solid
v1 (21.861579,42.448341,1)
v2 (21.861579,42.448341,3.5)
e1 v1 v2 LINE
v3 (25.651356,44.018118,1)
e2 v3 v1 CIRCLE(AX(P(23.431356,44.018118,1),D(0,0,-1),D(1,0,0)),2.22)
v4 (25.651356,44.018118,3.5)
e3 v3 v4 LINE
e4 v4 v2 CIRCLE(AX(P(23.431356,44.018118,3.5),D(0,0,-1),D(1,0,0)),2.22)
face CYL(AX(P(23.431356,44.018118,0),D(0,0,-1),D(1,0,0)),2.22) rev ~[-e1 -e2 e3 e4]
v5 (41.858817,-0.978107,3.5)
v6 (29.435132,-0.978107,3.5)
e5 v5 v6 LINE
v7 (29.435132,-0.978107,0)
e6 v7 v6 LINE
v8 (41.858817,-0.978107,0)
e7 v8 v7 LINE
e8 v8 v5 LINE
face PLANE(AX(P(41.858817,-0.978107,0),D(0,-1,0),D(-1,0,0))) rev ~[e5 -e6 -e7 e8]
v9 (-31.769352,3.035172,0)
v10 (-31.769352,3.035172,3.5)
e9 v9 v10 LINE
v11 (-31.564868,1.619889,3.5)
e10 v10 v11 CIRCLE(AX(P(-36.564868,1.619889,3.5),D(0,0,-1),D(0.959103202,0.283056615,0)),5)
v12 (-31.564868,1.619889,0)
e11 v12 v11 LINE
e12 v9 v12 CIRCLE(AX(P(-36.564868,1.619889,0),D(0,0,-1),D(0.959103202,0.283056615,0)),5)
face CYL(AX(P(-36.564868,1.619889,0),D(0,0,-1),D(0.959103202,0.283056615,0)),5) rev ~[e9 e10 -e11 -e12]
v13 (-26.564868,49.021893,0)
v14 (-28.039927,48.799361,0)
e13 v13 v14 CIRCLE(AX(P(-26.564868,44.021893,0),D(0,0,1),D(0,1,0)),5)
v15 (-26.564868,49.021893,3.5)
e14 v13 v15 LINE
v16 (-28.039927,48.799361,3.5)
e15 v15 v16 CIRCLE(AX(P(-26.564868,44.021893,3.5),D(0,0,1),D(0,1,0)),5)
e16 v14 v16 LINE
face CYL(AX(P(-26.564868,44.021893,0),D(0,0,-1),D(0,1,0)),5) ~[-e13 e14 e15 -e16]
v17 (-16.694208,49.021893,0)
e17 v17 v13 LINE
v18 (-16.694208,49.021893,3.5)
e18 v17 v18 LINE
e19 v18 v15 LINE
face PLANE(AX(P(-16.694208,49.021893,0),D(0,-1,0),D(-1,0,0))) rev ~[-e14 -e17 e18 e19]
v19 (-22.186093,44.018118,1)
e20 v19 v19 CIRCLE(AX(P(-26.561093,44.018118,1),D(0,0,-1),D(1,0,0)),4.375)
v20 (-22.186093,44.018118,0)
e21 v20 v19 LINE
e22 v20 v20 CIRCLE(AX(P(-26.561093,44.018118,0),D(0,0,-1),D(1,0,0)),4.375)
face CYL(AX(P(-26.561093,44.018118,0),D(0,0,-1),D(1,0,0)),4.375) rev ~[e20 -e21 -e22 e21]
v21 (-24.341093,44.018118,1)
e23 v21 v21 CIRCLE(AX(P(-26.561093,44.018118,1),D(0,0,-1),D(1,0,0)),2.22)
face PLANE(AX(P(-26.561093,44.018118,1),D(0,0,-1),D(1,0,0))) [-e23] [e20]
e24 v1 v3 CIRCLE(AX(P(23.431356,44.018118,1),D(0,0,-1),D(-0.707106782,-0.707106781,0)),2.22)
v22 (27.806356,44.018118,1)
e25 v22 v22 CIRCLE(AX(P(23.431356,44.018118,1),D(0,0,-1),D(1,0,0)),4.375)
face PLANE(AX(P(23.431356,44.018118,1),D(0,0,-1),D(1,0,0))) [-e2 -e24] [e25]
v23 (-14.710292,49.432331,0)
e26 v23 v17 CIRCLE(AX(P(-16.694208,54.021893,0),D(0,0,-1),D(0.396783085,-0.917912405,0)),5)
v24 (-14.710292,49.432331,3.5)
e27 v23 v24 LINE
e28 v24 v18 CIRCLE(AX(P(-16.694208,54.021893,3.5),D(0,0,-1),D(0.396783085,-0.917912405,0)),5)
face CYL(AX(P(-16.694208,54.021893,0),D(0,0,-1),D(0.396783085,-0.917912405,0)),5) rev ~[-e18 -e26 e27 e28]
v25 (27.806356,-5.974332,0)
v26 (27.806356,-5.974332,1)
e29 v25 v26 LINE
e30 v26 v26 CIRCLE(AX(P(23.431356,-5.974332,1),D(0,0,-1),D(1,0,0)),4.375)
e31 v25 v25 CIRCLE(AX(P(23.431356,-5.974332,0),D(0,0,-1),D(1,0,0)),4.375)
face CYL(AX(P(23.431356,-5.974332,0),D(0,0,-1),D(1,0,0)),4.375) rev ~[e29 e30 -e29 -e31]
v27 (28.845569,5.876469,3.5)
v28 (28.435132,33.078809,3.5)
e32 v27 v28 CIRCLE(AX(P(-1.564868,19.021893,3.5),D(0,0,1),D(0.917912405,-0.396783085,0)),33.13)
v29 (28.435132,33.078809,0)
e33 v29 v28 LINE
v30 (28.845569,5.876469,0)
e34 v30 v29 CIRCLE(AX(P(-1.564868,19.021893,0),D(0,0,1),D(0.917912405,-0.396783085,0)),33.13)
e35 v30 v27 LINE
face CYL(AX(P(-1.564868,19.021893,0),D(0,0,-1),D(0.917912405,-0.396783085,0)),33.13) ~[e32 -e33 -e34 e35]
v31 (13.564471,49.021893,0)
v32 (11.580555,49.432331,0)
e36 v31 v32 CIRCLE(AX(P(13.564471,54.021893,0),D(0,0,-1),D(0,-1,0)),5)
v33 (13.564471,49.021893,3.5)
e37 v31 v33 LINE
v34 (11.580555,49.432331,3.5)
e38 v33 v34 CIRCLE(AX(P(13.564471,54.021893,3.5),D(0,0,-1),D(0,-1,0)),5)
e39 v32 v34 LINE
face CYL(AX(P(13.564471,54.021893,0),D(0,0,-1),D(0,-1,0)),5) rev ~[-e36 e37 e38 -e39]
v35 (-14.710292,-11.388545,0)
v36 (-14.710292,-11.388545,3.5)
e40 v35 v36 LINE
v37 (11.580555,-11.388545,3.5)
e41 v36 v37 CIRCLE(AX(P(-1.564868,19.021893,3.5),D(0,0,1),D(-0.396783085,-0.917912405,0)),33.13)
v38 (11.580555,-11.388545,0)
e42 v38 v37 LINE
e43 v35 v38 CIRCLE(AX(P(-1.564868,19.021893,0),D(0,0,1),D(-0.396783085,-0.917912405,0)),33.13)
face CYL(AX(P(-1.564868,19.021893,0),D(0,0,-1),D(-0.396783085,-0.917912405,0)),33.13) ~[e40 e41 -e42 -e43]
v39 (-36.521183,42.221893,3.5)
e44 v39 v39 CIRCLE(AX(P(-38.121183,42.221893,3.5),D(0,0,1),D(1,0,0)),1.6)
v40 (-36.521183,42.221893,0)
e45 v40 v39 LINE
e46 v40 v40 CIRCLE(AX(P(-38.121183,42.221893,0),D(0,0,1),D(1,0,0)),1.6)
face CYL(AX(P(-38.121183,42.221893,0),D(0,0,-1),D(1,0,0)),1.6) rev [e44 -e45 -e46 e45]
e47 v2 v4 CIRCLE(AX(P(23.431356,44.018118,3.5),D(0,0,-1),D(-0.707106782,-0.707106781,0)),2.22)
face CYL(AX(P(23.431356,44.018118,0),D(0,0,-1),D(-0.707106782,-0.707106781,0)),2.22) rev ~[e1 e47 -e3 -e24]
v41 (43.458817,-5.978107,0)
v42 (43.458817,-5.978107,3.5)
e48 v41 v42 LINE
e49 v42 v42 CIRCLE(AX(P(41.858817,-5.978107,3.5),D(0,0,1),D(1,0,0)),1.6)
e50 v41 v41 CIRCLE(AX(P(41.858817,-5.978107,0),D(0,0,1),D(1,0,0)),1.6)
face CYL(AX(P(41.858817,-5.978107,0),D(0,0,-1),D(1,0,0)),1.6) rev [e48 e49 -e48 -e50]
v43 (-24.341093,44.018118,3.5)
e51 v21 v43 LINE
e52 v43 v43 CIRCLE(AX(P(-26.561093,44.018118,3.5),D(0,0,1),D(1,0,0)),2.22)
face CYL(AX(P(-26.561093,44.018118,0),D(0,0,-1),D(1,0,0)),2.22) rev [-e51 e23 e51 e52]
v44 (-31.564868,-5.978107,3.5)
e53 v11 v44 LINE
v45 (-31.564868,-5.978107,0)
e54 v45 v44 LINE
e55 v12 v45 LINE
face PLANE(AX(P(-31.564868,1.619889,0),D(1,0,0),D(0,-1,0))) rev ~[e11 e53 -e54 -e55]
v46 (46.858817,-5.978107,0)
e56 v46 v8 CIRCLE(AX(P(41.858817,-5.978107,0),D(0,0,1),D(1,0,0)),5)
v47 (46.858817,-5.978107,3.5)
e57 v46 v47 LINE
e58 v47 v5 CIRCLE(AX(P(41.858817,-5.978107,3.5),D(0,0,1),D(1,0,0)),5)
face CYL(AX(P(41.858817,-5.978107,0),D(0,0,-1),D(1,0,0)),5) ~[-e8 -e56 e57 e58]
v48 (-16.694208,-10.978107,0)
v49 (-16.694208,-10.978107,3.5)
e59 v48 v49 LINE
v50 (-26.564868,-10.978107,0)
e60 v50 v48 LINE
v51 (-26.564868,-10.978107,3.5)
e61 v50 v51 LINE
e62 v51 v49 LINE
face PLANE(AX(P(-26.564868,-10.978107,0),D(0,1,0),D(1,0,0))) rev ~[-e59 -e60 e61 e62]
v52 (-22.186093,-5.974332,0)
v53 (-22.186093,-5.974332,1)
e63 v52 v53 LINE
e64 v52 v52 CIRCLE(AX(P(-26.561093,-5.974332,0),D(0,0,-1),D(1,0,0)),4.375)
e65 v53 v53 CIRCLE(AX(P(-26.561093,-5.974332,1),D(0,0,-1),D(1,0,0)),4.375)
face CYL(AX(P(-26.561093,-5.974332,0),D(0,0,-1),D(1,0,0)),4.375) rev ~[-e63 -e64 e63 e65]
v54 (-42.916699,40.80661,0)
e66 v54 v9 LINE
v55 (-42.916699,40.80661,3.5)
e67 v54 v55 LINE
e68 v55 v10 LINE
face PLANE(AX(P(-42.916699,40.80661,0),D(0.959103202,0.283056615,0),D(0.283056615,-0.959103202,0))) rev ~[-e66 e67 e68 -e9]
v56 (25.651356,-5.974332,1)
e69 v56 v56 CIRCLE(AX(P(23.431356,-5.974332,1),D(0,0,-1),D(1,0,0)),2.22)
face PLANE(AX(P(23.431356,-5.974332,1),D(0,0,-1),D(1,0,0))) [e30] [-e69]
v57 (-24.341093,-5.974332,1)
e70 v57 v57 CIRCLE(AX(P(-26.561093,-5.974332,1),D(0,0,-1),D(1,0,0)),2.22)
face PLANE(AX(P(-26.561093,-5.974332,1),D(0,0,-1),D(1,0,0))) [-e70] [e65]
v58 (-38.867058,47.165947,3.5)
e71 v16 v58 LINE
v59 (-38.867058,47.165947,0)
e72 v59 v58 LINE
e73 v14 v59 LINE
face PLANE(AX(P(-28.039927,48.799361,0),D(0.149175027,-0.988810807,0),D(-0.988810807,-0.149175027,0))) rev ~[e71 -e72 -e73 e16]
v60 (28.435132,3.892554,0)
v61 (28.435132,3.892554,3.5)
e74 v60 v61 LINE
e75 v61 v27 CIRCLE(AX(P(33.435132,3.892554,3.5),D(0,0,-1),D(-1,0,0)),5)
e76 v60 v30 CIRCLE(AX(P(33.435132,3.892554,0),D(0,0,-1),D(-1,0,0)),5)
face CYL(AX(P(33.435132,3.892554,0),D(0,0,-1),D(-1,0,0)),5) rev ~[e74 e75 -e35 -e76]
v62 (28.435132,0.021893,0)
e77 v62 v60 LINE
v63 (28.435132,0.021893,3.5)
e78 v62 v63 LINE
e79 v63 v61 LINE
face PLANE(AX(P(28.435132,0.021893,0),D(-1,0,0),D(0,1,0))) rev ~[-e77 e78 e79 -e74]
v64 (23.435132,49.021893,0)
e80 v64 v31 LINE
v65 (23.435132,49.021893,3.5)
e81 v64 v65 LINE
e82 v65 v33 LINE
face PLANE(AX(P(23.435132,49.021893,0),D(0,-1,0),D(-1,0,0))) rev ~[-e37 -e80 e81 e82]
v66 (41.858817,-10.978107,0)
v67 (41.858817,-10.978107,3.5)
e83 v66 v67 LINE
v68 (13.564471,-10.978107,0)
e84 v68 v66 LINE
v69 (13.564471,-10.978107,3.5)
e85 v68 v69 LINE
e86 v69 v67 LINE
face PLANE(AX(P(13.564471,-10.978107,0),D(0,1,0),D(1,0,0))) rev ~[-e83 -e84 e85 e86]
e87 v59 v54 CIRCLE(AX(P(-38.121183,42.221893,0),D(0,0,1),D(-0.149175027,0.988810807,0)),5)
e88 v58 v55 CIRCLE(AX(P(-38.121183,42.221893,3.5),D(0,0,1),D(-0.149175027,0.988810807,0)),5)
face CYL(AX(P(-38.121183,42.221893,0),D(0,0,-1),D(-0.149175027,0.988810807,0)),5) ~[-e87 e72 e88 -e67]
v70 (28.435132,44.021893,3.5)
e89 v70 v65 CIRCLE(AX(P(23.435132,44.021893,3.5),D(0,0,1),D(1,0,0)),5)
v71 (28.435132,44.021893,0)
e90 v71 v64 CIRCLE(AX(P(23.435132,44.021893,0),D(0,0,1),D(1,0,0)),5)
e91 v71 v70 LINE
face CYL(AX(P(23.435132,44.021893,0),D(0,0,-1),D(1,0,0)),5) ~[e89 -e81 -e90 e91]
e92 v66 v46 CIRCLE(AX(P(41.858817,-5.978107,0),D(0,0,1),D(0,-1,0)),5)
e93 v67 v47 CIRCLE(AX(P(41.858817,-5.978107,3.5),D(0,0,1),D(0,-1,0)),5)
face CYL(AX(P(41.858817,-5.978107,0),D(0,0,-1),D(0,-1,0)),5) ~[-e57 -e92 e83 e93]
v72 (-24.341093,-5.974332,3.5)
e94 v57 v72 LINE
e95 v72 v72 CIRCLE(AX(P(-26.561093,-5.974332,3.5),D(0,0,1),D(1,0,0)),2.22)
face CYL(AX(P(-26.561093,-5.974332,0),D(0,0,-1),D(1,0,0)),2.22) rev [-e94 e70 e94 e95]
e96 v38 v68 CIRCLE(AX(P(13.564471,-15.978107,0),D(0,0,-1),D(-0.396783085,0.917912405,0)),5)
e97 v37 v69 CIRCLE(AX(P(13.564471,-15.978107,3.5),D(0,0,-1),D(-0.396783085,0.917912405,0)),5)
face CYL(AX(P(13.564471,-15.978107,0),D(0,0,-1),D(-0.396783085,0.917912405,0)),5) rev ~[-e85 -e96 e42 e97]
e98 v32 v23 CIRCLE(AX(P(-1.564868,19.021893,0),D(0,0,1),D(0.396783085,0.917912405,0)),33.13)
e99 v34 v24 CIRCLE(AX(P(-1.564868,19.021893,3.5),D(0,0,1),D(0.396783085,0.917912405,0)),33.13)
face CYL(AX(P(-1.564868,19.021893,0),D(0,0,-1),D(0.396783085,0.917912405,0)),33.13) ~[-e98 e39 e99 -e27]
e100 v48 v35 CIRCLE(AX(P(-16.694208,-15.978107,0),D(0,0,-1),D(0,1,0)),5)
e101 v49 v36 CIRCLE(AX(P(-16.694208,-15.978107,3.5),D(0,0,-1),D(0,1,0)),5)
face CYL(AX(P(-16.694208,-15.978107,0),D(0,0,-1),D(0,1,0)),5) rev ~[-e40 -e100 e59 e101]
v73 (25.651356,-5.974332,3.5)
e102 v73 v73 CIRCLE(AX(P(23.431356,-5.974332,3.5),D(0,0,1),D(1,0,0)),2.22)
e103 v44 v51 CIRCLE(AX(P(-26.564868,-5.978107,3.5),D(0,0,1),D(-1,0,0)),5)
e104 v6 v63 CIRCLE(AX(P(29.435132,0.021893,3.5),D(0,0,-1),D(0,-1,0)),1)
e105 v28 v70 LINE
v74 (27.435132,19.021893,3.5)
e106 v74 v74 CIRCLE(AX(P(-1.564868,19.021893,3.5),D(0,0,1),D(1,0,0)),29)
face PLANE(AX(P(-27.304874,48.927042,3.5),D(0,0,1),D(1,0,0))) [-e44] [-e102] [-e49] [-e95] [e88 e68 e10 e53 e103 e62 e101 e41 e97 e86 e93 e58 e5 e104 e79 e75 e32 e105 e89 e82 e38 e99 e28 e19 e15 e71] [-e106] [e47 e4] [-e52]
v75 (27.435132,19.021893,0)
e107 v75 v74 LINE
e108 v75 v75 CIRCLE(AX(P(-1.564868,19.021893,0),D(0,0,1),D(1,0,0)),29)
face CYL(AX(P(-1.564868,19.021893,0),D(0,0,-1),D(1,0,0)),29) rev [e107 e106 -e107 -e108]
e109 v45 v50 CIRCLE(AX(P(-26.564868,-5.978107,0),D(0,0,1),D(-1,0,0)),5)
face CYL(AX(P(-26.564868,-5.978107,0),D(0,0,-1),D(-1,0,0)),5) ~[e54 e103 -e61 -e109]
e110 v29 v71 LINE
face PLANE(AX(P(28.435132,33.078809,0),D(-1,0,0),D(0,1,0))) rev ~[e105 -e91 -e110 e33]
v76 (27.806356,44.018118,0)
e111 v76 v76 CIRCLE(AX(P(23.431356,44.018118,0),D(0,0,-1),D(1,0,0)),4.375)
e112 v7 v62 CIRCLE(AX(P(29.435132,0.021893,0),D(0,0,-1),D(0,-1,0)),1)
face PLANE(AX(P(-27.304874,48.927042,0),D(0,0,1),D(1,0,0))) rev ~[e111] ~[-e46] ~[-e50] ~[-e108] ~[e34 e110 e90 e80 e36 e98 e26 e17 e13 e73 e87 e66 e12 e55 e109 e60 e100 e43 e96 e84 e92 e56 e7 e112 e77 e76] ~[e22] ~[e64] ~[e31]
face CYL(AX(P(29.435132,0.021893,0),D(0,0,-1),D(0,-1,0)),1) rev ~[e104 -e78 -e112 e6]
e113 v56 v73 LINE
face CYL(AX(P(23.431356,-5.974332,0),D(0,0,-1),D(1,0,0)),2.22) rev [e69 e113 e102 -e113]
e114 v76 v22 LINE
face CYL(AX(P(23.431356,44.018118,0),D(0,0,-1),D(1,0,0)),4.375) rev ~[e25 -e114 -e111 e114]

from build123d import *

# Parameters (mm, degrees)
F0_R     = 2.22
F0_R_2   = 29
F0_R_3   = 1.6
F2_DEPTH = 3.5
F3_R     = 4.375
F3_R_2   = 2.22
F4_DEPTH = 1


with BuildPart() as f2:
    # F0 (on Top) → F2 (new body)
    with BuildSketch(Plane.XY):
        with BuildLine():
            Line((-28.0399272842, 48.7993610323), (-26.564868493, 49.0218929201))
            ThreePointArc((-26.564868493, 49.0218929201), (-27.3107436298, 48.965946953), (-28.0399272842, 48.7993610323))
        make_face()
        with BuildLine():
            Line((-16.69420754, 49.0218929201), (-26.564868493, 49.0218929201))
            Line((-26.564868493, 49.0218929201), (-28.0399272842, 48.7993610323))
            Line((-28.0399272842, 48.7993610323), (-38.8670578152, 47.165946953))
            ThreePointArc((-38.8670578152, 47.165946953), (-42.3386518344, 44.9075872285), (-42.9166986895, 40.8066098434))
            Line((-42.9166986895, 40.8066098434), (-31.7693524819, 3.0351716781))
            ThreePointArc((-31.7693524819, 3.0351716781), (-31.6162535325, 2.3348780924), (-31.564868493, 1.6198886013))
            Line((-31.564868493, 1.6198886013), (-31.564868493, -5.9781070799))
            ThreePointArc((-31.564868493, -5.9781070799), (-30.1004023989, -9.5136409858), (-26.564868493, -10.9781070799))
            Line((-26.564868493, -10.9781070799), (-16.69420754, -10.9781070799))
            ThreePointArc((-16.69420754, -10.9781070799), (-15.6812440963, -11.0817916221), (-14.7102921129, -11.3885450552))
            ThreePointArc((-14.7102921129, -11.3885450552), (-1.564868493, -14.1081070799), (11.5805551269, -11.3885450552))
            ThreePointArc((11.5805551269, -11.3885450552), (12.5515071103, -11.0817916221), (13.564470554, -10.9781070799))
            Line((13.564470554, -10.9781070799), (23.435131507, -10.9781070799))
            Line((23.435131507, -10.9781070799), (41.8588173216, -10.9781070799))
            ThreePointArc((41.8588173216, -10.9781070799), (39.4580409401, -10.3640246311), (37.6469744143, -8.6726161862))
            ThreePointArc((37.6469744143, -8.6726161862), (37.5867252108, -8.5760349073), (37.5286903027, -8.4781070799))
            ThreePointArc((37.5286903027, -8.4781070799), (37.5286903027, -3.4781070799), (41.8588173216, -0.9781070799))
            Line((41.8588173216, -0.9781070799), (29.435131507, -0.9781070799))
            ThreePointArc((29.435131507, -0.9781070799), (28.7280247258, -0.6852138611), (28.435131507, 0.0218929201))
            Line((28.435131507, 0.0218929201), (28.435131507, 3.8925538731))
            ThreePointArc((28.435131507, 3.8925538731), (28.5388160493, 4.9055173169), (28.8455694823, 5.8764693002))
            ThreePointArc((28.8455694823, 5.8764693002), (31.5613609993, 19.521712514), (28.435131507, 33.0788093672))
            Line((28.435131507, 33.0788093672), (28.435131507, 44.0218929201))
            ThreePointArc((28.435131507, 44.0218929201), (26.9706654129, 47.5574268261), (23.435131507, 49.0218929201))
            Line((23.435131507, 49.0218929201), (13.564470554, 49.0218929201))
            ThreePointArc((13.564470554, 49.0218929201), (12.5515071103, 49.1255774624), (11.5805551269, 49.4323308955))
            ThreePointArc((11.5805551269, 49.4323308955), (-1.564868493, 52.1518929201), (-14.7102921129, 49.4323308955))
            ThreePointArc((-14.7102921129, 49.4323308955), (-15.6812440963, 49.1255774624), (-16.69420754, 49.0218929201))
        make_face()
        with Locations((-26.5610932079, -5.9743317948)):
            Circle(F0_R, mode=Mode.SUBTRACT)
        with Locations((23.4313562219, -5.9743317948)):
            Circle(F0_R, mode=Mode.SUBTRACT)
        with Locations((-1.564868493, 19.0218929201)):
            Circle(F0_R_2, mode=Mode.SUBTRACT)
        with Locations((-38.1211826784, 42.2218929201)):
            Circle(F0_R_3, mode=Mode.SUBTRACT)
        with Locations((-26.561093208, 44.0181176351)):
            Circle(F0_R, mode=Mode.SUBTRACT)
        with BuildLine():
            ThreePointArc((25.6513562219, 44.0181176351), (24.2809134408, 41.9671050725), (21.8615791662, 42.4483405824))
            ThreePointArc((21.8615791662, 42.4483405824), (22.5817990031, 46.0691301977), (25.6513562219, 44.0181176351))
        make_face(mode=Mode.SUBTRACT)
        with BuildLine():
            ThreePointArc((46.8588173216, -5.9781070799), (45.3943512276, -2.4425731739), (41.8588173216, -0.9781070799))
            ThreePointArc((41.8588173216, -0.9781070799), (37.5286903027, -3.4781070799), (37.5286903027, -8.4781070799))
            ThreePointArc((37.5286903027, -8.4781070799), (37.5867252108, -8.5760349073), (37.6469744143, -8.6726161862))
            ThreePointArc((37.6469744143, -8.6726161862), (39.4580409401, -10.3640246311), (41.8588173216, -10.9781070799))
            ThreePointArc((41.8588173216, -10.9781070799), (45.3943512276, -9.5136409858), (46.8588173216, -5.9781070799))
        make_face()
        with Locations((41.8588173216, -5.9781070799)):
            Circle(F0_R_3, mode=Mode.SUBTRACT)
    extrude(amount=F2_DEPTH)

    # F3 (on face) → F4 (cut)
    with BuildSketch(Plane(origin=(0, 0, 0), x_dir=(1, 0, 0), z_dir=(0, 0, -1))):
        with Locations((23.4313562219, 5.9743317948)):
            Circle(F3_R)
        with Locations((23.4313562219, 5.9743317948)):
            Circle(F3_R_2, mode=Mode.SUBTRACT)
        with Locations((-26.5610932079, 5.9743317948)):
            Circle(F3_R)
        with Locations((-26.5610932079, 5.9743317948)):
            Circle(F3_R_2, mode=Mode.SUBTRACT)
        with Locations((-26.561093208, -44.0181176351)):
            Circle(F3_R)
        with Locations((-26.561093208, -44.0181176351)):
            Circle(F3_R_2, mode=Mode.SUBTRACT)
        with Locations((23.4313562219, -44.0181176351)):
            Circle(F3_R)
        with Locations((23.4313562219, -44.0181176351)):
            Circle(F3_R_2, mode=Mode.SUBTRACT)
        with Locations((-26.5610932079, 5.9743317948)):
            Circle(F3_R_2)
        with Locations((23.4313562219, 5.9743317948)):
            Circle(F3_R_2)
        with Locations((23.4313562219, -44.0181176351)):
            Circle(F3_R_2)
        with Locations((-26.561093208, -44.0181176351)):
            Circle(F3_R_2)
    extrude(amount=-F4_DEPTH, mode=Mode.SUBTRACT)


solid = f2.part
